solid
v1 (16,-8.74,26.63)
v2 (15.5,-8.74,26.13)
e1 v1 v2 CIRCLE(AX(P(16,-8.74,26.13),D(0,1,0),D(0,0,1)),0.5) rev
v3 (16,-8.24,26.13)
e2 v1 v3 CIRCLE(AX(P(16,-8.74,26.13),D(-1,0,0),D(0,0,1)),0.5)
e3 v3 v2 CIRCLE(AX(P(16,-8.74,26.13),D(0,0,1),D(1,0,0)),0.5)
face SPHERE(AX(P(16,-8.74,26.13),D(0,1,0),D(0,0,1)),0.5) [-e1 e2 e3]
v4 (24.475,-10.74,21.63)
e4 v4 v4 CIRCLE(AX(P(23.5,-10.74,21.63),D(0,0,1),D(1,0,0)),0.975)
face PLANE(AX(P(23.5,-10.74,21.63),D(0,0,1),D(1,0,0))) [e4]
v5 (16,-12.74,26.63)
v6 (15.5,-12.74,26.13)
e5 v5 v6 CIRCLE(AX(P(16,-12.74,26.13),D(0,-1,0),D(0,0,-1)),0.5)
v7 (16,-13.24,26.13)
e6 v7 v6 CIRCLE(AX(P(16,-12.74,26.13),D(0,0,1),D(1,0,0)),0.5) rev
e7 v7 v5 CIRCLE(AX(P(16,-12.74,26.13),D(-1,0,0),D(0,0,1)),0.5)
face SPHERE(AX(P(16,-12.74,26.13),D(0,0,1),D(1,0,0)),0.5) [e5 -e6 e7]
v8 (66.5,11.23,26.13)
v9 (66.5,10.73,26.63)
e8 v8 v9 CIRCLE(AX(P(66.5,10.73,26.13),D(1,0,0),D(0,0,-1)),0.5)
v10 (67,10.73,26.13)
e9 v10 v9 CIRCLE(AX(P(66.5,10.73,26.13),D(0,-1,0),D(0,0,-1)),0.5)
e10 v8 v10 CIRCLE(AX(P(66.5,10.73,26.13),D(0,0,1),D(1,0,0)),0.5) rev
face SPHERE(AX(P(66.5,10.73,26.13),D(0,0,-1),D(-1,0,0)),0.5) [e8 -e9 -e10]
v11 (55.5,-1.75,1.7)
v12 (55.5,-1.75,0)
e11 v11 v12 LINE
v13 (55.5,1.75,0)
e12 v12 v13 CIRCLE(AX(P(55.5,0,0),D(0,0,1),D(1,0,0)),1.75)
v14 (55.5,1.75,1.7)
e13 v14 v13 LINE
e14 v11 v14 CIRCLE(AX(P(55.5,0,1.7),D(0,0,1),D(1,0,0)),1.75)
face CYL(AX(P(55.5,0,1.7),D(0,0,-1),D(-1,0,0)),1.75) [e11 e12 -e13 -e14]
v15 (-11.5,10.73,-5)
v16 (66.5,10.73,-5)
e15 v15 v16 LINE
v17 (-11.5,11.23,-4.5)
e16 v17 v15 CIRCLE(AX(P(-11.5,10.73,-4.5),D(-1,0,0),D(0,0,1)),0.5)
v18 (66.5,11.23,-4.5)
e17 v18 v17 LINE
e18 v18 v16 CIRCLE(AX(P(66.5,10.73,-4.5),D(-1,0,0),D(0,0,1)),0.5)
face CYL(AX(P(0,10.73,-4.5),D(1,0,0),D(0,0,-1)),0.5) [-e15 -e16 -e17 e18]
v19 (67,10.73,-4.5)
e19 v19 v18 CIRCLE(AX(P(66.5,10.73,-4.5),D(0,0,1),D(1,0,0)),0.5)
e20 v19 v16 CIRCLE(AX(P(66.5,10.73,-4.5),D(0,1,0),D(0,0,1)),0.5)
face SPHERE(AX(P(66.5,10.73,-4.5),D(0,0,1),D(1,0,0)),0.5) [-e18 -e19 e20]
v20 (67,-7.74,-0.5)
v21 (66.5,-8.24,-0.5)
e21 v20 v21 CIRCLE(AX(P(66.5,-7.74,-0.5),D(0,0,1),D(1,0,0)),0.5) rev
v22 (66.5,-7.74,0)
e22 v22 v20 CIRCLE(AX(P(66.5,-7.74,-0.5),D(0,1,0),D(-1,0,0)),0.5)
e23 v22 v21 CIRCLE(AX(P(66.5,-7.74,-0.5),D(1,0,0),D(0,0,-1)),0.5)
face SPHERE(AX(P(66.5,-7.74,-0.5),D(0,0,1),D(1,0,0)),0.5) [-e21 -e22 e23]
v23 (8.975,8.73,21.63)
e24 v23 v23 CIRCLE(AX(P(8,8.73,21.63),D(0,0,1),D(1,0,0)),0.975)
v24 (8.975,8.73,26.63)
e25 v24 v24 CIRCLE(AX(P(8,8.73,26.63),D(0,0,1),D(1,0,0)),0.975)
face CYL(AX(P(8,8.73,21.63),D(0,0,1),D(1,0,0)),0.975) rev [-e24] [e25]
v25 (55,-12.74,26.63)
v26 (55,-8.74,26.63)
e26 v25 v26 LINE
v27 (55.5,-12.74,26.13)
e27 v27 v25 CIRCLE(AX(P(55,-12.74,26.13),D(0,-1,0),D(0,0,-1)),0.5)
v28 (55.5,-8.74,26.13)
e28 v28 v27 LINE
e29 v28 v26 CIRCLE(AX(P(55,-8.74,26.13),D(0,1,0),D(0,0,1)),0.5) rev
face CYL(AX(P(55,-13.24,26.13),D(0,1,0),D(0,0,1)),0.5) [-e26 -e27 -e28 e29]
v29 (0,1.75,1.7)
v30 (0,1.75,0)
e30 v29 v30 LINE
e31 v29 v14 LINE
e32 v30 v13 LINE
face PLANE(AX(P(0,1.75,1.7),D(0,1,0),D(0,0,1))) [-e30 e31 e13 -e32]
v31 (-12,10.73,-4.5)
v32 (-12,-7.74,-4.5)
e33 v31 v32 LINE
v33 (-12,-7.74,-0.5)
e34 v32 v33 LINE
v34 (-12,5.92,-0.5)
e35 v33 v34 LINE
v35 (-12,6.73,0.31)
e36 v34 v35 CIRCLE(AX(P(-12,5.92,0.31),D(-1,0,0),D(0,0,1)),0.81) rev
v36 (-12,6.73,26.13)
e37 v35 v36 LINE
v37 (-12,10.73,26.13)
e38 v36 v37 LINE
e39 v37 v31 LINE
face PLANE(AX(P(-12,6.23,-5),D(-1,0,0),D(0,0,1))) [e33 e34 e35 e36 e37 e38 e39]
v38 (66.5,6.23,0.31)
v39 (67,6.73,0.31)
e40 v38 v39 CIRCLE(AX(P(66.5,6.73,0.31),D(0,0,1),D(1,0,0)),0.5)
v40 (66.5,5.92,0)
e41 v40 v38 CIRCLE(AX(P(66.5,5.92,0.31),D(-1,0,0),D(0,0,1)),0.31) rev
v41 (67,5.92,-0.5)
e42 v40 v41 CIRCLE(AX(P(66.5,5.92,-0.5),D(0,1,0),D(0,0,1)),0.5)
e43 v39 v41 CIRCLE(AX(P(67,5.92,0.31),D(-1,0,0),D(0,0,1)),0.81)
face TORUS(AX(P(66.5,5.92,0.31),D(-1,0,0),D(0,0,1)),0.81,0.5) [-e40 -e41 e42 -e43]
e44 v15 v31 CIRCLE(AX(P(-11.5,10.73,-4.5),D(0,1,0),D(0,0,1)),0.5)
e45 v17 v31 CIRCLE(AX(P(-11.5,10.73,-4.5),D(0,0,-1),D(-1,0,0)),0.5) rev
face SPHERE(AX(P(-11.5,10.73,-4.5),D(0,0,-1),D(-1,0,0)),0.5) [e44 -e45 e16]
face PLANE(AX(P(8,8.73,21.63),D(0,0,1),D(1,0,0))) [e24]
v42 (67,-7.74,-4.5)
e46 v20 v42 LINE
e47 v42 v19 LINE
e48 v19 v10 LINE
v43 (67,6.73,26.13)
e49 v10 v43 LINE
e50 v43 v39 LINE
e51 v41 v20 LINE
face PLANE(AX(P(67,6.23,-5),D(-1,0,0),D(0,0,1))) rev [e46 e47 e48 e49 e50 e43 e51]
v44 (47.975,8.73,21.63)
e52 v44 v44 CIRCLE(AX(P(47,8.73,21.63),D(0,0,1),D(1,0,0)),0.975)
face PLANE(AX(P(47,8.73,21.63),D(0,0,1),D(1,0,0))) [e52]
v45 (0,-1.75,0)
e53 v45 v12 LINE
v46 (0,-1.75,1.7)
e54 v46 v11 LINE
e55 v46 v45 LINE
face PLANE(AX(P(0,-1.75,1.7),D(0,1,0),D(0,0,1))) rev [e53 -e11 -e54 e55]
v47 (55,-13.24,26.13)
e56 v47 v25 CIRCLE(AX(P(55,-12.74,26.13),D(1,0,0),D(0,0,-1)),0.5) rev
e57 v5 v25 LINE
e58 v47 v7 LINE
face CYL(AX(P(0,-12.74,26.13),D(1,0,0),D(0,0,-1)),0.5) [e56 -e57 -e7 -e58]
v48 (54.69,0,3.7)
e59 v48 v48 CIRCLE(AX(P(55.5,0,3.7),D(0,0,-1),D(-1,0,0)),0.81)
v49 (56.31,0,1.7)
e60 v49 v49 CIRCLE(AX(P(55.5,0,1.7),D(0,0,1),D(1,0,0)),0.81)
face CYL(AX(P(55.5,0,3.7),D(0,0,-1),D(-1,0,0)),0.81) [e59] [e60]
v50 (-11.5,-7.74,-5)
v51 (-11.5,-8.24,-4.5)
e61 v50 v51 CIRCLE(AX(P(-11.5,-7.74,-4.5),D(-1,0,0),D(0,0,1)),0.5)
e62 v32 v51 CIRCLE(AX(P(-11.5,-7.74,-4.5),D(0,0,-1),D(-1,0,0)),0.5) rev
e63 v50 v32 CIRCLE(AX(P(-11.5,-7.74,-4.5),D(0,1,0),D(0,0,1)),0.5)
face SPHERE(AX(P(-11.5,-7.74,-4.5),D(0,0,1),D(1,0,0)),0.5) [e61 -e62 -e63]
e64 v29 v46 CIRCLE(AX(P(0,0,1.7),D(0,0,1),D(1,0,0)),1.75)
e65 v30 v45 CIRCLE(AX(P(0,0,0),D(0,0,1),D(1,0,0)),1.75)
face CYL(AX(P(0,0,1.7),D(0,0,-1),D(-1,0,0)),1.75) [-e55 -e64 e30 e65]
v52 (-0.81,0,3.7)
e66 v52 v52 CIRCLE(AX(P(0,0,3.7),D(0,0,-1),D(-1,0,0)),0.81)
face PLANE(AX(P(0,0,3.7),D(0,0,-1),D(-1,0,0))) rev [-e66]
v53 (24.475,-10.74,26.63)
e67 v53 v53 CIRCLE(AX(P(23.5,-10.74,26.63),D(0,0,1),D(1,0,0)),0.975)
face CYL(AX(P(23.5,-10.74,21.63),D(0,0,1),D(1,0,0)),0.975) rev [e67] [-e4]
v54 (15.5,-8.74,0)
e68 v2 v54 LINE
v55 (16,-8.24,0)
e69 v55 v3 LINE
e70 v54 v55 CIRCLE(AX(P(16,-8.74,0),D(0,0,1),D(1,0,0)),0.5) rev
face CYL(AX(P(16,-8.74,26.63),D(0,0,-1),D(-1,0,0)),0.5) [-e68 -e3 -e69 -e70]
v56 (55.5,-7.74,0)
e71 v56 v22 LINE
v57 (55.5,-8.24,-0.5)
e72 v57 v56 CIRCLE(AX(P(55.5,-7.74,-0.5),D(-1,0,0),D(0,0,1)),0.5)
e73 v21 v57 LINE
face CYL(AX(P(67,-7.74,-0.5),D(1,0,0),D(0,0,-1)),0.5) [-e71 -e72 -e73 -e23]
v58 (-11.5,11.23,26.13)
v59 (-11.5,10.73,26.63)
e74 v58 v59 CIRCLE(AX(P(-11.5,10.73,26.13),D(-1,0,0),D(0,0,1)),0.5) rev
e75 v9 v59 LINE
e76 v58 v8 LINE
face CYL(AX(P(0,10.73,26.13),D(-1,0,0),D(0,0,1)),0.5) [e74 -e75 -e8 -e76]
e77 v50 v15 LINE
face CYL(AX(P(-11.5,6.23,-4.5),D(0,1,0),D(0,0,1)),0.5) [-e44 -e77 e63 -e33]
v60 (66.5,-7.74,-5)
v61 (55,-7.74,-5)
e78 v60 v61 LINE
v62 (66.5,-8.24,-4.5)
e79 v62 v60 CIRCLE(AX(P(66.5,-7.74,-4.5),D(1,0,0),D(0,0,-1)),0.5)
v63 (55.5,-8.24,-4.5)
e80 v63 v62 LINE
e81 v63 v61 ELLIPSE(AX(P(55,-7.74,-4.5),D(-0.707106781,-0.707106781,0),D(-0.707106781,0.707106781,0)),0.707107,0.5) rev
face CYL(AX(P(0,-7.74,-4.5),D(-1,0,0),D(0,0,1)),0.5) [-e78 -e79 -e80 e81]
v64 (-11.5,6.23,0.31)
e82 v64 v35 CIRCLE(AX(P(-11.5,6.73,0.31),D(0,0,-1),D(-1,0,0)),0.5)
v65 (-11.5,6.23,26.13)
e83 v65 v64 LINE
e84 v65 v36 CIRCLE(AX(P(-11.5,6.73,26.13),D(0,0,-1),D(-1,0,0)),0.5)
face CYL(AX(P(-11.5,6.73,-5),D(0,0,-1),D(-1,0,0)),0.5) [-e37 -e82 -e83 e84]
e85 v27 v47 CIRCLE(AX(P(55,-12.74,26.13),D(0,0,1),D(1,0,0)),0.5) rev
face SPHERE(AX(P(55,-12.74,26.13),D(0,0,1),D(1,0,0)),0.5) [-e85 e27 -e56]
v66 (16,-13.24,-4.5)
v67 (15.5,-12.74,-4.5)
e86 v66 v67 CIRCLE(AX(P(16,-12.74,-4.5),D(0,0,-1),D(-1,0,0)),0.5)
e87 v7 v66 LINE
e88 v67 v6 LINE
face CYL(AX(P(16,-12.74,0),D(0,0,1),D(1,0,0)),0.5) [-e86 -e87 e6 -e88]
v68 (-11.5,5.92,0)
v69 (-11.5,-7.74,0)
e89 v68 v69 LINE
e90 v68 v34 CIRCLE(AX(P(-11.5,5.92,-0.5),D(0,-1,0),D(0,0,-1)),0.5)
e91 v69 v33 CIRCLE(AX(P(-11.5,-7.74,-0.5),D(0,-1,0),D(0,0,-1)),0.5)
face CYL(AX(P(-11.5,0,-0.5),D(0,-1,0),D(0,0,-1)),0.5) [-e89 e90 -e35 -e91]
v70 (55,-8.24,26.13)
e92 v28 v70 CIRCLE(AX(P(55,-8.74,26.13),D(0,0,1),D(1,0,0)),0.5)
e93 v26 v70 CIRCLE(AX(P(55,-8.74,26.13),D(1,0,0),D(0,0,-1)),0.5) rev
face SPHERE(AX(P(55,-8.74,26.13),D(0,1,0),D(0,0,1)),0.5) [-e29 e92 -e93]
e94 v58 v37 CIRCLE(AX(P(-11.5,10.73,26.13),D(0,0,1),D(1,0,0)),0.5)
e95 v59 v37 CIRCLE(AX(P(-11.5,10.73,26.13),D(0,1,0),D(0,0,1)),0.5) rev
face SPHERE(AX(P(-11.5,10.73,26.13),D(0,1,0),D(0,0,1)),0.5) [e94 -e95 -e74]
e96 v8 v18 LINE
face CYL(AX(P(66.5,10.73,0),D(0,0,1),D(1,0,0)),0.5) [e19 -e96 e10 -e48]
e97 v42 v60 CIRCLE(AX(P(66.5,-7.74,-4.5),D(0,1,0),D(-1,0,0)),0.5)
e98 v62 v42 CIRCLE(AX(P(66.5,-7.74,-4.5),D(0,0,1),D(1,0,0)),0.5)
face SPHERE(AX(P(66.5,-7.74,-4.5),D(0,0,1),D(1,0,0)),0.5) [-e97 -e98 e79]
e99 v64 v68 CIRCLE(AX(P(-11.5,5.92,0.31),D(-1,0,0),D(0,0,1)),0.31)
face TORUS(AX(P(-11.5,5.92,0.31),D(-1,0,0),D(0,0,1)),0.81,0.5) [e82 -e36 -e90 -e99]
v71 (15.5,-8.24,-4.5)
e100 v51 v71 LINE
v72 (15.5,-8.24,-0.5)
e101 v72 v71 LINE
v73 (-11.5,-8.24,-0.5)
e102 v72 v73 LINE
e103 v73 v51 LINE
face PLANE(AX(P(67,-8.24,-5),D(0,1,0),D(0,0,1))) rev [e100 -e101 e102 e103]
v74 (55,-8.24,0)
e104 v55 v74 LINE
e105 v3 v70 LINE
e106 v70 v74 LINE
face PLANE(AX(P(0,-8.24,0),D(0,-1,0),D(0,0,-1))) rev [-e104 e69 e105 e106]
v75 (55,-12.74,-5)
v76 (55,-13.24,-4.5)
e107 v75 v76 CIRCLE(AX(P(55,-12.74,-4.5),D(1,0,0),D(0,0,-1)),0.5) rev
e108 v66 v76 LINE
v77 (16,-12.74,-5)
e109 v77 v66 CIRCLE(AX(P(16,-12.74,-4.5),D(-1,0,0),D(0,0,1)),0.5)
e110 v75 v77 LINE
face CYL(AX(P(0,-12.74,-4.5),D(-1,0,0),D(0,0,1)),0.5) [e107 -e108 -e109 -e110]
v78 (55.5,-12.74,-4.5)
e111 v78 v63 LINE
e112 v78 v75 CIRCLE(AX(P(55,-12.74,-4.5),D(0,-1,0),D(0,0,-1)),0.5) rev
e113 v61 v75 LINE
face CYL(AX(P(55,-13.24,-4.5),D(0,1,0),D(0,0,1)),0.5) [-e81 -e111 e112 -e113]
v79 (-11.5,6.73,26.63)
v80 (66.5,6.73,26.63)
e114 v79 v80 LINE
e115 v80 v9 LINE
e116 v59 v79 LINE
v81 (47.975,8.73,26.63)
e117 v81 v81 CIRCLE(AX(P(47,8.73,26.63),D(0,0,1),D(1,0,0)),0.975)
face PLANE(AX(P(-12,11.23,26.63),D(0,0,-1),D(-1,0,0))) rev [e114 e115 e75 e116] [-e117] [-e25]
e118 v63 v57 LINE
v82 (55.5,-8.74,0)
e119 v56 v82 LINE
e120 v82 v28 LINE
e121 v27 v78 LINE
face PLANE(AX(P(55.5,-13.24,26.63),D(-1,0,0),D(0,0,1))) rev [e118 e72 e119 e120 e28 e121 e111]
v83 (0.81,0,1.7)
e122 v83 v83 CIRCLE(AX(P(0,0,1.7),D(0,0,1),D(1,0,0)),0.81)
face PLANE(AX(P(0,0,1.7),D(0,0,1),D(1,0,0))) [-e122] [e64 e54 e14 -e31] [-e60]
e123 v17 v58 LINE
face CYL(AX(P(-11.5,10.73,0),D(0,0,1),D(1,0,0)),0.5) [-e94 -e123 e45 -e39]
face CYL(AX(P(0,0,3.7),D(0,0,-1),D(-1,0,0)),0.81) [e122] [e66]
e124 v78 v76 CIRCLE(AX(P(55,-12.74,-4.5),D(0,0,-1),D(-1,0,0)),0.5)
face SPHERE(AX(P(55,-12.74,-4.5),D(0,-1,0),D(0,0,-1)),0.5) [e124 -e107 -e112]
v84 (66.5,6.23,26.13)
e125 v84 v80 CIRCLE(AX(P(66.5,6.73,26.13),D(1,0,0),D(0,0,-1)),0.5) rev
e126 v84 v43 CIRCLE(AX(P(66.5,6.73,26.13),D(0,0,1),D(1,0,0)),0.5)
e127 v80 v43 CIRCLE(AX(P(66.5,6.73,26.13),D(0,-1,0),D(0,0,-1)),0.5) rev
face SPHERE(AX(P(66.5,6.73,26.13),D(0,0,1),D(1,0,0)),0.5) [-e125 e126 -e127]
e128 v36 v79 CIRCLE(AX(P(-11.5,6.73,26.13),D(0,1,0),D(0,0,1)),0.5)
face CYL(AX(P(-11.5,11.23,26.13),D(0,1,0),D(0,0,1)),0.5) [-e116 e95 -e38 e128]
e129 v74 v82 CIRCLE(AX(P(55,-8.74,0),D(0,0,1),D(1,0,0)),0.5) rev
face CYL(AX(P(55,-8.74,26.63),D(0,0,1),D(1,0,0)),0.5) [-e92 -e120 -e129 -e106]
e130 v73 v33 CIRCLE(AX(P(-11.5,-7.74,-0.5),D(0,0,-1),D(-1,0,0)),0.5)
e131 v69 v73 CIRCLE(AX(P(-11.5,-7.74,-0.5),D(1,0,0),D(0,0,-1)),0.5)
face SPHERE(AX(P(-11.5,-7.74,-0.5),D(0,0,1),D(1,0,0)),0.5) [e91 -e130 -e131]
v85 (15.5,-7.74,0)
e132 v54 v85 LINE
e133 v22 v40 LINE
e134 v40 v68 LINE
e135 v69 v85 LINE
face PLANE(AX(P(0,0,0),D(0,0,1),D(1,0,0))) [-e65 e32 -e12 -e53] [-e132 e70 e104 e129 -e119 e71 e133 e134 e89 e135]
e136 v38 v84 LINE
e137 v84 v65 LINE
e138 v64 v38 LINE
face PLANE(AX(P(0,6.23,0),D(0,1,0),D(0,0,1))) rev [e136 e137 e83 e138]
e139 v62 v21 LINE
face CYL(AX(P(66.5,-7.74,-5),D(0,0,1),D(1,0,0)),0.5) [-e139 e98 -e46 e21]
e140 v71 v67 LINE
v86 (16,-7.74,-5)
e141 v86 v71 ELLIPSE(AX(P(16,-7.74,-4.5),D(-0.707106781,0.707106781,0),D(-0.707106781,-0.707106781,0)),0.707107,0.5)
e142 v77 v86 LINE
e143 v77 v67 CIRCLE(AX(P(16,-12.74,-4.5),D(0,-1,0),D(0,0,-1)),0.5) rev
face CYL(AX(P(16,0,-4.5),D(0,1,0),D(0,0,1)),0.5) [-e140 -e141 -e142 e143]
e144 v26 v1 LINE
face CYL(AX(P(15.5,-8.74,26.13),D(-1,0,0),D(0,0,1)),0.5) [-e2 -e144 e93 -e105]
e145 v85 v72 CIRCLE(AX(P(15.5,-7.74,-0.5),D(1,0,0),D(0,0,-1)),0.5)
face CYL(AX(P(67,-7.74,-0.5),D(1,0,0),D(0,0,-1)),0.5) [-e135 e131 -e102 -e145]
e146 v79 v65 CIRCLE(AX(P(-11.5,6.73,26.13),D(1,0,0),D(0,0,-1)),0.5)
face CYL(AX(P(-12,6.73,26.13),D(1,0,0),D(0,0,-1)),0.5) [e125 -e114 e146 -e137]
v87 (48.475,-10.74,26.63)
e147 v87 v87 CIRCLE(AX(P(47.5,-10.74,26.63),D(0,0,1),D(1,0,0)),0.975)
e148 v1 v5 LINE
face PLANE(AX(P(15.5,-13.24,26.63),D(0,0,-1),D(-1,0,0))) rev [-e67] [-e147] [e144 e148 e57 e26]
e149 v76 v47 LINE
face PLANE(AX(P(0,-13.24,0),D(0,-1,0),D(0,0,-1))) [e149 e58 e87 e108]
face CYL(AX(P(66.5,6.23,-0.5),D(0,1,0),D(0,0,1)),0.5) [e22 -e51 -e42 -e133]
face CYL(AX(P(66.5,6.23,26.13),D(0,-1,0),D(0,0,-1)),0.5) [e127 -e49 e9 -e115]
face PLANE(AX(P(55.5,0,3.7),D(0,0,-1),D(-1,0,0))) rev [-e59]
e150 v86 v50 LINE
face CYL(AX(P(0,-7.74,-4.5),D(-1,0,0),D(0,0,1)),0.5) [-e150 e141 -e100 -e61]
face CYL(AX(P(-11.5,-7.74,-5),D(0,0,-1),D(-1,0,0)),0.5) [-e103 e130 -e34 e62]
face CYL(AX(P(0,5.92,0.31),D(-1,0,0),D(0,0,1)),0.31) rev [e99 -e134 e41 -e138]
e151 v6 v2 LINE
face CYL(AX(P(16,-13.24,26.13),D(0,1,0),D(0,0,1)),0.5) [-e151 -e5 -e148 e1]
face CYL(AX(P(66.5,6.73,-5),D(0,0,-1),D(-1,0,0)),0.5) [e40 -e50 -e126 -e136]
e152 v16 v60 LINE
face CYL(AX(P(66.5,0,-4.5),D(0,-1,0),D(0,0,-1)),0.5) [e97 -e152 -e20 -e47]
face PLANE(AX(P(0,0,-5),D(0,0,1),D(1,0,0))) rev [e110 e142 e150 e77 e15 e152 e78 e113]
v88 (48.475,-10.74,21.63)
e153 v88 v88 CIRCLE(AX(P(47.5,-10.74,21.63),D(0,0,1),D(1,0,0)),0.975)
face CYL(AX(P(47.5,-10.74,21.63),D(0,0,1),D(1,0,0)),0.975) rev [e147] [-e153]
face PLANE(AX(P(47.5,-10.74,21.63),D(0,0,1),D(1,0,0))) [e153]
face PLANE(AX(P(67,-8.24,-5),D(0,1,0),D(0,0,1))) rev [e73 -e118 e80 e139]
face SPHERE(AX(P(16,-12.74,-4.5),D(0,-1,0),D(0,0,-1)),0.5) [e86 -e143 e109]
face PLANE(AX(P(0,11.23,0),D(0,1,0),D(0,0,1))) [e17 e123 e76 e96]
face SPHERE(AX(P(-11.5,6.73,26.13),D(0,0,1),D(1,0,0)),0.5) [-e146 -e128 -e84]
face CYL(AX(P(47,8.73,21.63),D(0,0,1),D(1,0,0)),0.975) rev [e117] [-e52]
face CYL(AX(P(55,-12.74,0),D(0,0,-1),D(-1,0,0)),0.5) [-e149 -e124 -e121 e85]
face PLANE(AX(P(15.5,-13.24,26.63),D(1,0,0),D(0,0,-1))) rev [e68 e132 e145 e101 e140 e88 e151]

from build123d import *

# Parameters (mm, degrees)
EXTRUDE_3_DEPTH     = 1.7
SKETCH_4_R          = 0.81
EXTRUDE_4_DEPTH     = 3.7
SKETCH_5_W          = 79
SKETCH_5_H          = 14.47
EXTRUDE_5_DEPTH     = 5
SKETCH_6_W          = 79
SKETCH_6_H          = 31.63
EXTRUDE_6_DEPTH     = 5
FILLET_1_R          = 0.31
FILLET_2_R          = 0.5
FILLET_3_R          = 0.5
FILLET_5_R          = 0.5
SKETCH_8_W          = 40
SKETCH_8_H          = 31.63
EXTRUDE_7_DEPTH     = 5
FILLET_6_R          = 0.5
SKETCH_9_R          = 0.975
CUT_EXTRUDE_1_DEPTH = 5
FILLET_7_R          = 0.5


with BuildPart() as part:
    # 草图1 → 凸台-拉伸3 (new body)
    with BuildSketch(Plane.XY):
        with BuildLine():
            Line((0, 1.75), (55.5, 1.75))
            ThreePointArc((55.5, 1.75), (57.25, 0), (55.5, -1.75))
            Line((55.5, -1.75), (0, -1.75))
            ThreePointArc((0, -1.75), (-1.75, 0), (0, 1.75))
        make_face()
    extrude(amount=EXTRUDE_3_DEPTH)

    # 草图4 → 凸台-拉伸4 (add)
    with BuildSketch(Plane(origin=(0, 0, 0), x_dir=(-1, 0, 0), z_dir=(0, 0, -1))):
        Circle(SKETCH_4_R)
        with Locations((-55.5, 0)):
            Circle(SKETCH_4_R)
    extrude(amount=-EXTRUDE_4_DEPTH)

    # 草图5 → 凸台-拉伸5 (add)
    with BuildSketch(Plane(origin=(0, 0, 0), x_dir=(-1, 0, 0), z_dir=(0, 0, -1))):
        with Locations((-27.5, -1.005)):
            Rectangle(SKETCH_5_W, SKETCH_5_H)
    extrude(amount=EXTRUDE_5_DEPTH)

    # 草图6 → 凸台-拉伸6 (add)
    with BuildSketch(Plane(origin=(0, 6.23, 0), x_dir=(1, 0, 0), z_dir=(0, 1, 0))):
        with Locations((27.5, -10.815)):
            Rectangle(SKETCH_6_W, SKETCH_6_H)
    extrude(amount=EXTRUDE_6_DEPTH)

    # 圆角1
    fillet_1_edges = [part.edges().sort_by_distance(p)[0] for p in [
        (27.5, 6.23, 0),
    ]]
    fillet(fillet_1_edges, radius=FILLET_1_R)

    # 圆角2
    fillet_2_edges = [part.edges().sort_by_distance(p)[0] for p in [
        (67, -8.24, -2.5),
    ]]
    fillet(fillet_2_edges, radius=FILLET_2_R)

    # 圆角3
    fillet_3_edges = [part.edges().sort_by_distance(p)[0] for p in [
        (-12, -8.24, -2.5),
    ]]
    fillet(fillet_3_edges, radius=FILLET_3_R)

    # 圆角5
    fillet_5_edges = [part.edges().sort_by_distance(p)[0] for p in [
        (67, 11.23, 10.815),
    ]]
    fillet(fillet_5_edges, radius=FILLET_5_R)

    # 草图8 → 凸台-拉伸7 (add)
    with BuildSketch(Plane(origin=(0, -8.24, 0), x_dir=(-1, 0, 0), z_dir=(0, -1, 0))):
        with Locations((-35.5, -10.815)):
            Rectangle(SKETCH_8_W, SKETCH_8_H)
    extrude(amount=EXTRUDE_7_DEPTH)

    # 圆角6
    fillet_6_edges = [part.edges().sort_by_distance(p)[0] for p in [
        (67, 8.48, 26.63),
        (66.853553391, 11.083553391, 26.63),
        (2, -8.24, -5),
        (-11.853553391, -8.093553391, -5),
        (27.25, 11.23, -5),
        (66.853553391, 11.083553391, -5),
        (61, -8.24, -5),
        (66.853553391, -8.093553391, -5),
        (27.5, 6.23, 26.63),
        (-12, 8.73, 26.63),
        (27.25, 11.23, 26.63),
        (-12, 11.23, 10.815),
        (15.5, -8.24, 13.315),
        (15.5, -10.74, 26.63),
        (35.5, -8.24, 26.63),
        (55.5, -8.24, 13.315),
        (55.5, -10.74, 26.63),
        (55.5, -13.24, 10.815),
        (35.5, -13.24, 26.63),
        (15.5, -13.24, 10.815),
        (15.5, -10.74, -5),
        (-12, 1.745, -5),
        (55.5, -10.74, -5),
        (35.5, -13.24, -5),
        (67, 1.495, -5),
    ]]
    fillet(fillet_6_edges, radius=FILLET_6_R)

    # 草图9 → 切除-拉伸1 (cut)
    with BuildSketch(Plane.XY.offset(26.63)):
        with Locations((23.5, -10.74)):
            Circle(SKETCH_9_R)
        with Locations((47.5, -10.74)):
            Circle(SKETCH_9_R)
        with Locations((8, 8.73)):
            Circle(SKETCH_9_R)
        with Locations((47, 8.73)):
            Circle(SKETCH_9_R)
    extrude(amount=-CUT_EXTRUDE_1_DEPTH, mode=Mode.SUBTRACT)

    # 圆角7
    # the kernel refuses this fillet: 0.5 mm, written as the material it takes off along each edge
    with BuildSketch(Plane(origin=(-11.5, 6.73, 26.13), x_dir=(-1, 0, 0), z_dir=(0, -1, 0))) as fillet_7_piece_1_section:
        Polygon((0, 0), (FILLET_7_R * 1.02, 0), (FILLET_7_R * 1.02, -FILLET_7_R * 1.02), (0, -FILLET_7_R * 1.02), align=None)
    fillet_7_piece_1 = extrude(amount=FILLET_7_R * 1.02, mode=Mode.PRIVATE)
    fillet_7_piece_1 = fillet_7_piece_1 - Plane(origin=(-11.5, 6.73, 26.13), x_dir=(0.7071067811865475, 0, -0.7071067811865475), z_dir=(0, -1, 0)) * Sphere(FILLET_7_R, mode=Mode.PRIVATE)
    add(fillet_7_piece_1, mode=Mode.SUBTRACT)
    with BuildSketch(Plane(origin=(66.5, 6.73, 26.13), x_dir=(0, -1, 0), z_dir=(1, 0, 0))) as fillet_7_piece_2_section:
        Polygon((0, 0), (FILLET_7_R * 1.02, 0), (FILLET_7_R * 1.02, -FILLET_7_R * 1.02), (0, -FILLET_7_R * 1.02), align=None)
    fillet_7_piece_2 = extrude(amount=FILLET_7_R * 1.02, mode=Mode.PRIVATE)
    fillet_7_piece_2 = fillet_7_piece_2 - Plane(origin=(66.5, 6.73, 26.13), x_dir=(0, 0.7071067811865475, -0.7071067811865475), z_dir=(1, 0, 0)) * Sphere(FILLET_7_R, mode=Mode.PRIVATE)
    add(fillet_7_piece_2, mode=Mode.SUBTRACT)
    with BuildSketch(Plane(origin=(-12, 5.92, 0), x_dir=(1, 0, 0), z_dir=(0, -1, 0))) as fillet_7_piece_3:
        with BuildLine():
            CenterArc((FILLET_7_R, -FILLET_7_R), FILLET_7_R, 90, 90)
            Line((0, -FILLET_7_R), (0, 0))
            Line((0, 0), (FILLET_7_R, 0))
        make_face()
    extrude(amount=13.66, mode=Mode.SUBTRACT)
    with BuildSketch(Plane(origin=(67, -7.74, 0), x_dir=(0, 0, -1), z_dir=(0, 1, 0))) as fillet_7_piece_4:
        with BuildLine():
            CenterArc((FILLET_7_R, FILLET_7_R), FILLET_7_R, 180, 90)
            Line((0, FILLET_7_R), (0, 0))
            Line((0, 0), (FILLET_7_R, 0))
        make_face()
    extrude(amount=13.66, mode=Mode.SUBTRACT)
    with BuildSketch(Plane(origin=(-12, 6.23, 26.13), x_dir=(1, 0, 0), z_dir=(0, 0, -1))) as fillet_7_piece_5:
        with BuildLine():
            CenterArc((FILLET_7_R, -FILLET_7_R), FILLET_7_R, 90, 90)
            Line((0, -FILLET_7_R), (0, 0))
            Line((0, 0), (FILLET_7_R, 0))
        make_face()
    extrude(amount=25.82, mode=Mode.SUBTRACT)
    with BuildSketch(Plane(origin=(-12, 5.92, 0.31), x_dir=(0, 0, -1), z_dir=(0, -1, 0))) as fillet_7_piece_6:
        with BuildLine():
            CenterArc((0.31 + FILLET_7_R, FILLET_7_R), FILLET_7_R, 180, 90)
            Line((0.31 + FILLET_7_R, 0), (0.31, 0))
            Line((0.31, 0), (0.31, FILLET_7_R))
        make_face()
    revolve(axis=Axis((-12, 5.92, 0.31), (1, 0, 0)), revolution_arc=90, mode=Mode.SUBTRACT)
    with BuildSketch(Plane(origin=(67, 5.92, 0.31), x_dir=(0, 0, -1), z_dir=(0, -1, 0))) as fillet_7_piece_7:
        with BuildLine():
            CenterArc((0.31 + FILLET_7_R, -FILLET_7_R), FILLET_7_R, 90, 90)
            Line((0.31, -FILLET_7_R), (0.31, 0))
            Line((0.31, 0), (0.31 + FILLET_7_R, 0))
        make_face()
    revolve(axis=Axis((67, 5.92, 0.31), (1, 0, 0)), revolution_arc=90, mode=Mode.SUBTRACT)
    with BuildSketch(Plane(origin=(55.5, -8.24, 0), x_dir=(0, 1, 0), z_dir=(1, 0, 0))) as fillet_7_piece_8:
        with BuildLine():
            CenterArc((FILLET_7_R, -FILLET_7_R), FILLET_7_R, 90, 90)
            Line((0, -FILLET_7_R), (0, 0))
            Line((0, 0), (FILLET_7_R, 0))
        make_face()
    extrude(amount=11, mode=Mode.SUBTRACT)
    with BuildSketch(Plane(origin=(66.5, -7.74, 0), x_dir=(1, 0, 0), z_dir=(0, 1, 0))) as fillet_7_piece_9:
        with BuildLine():
            CenterArc((0.5 - FILLET_7_R, FILLET_7_R), FILLET_7_R, 270, 90)
            Line((0.5 - FILLET_7_R, 0), (0.5, 0))
            Line((0.5, 0), (0.5, FILLET_7_R))
        make_face()
    revolve(axis=Axis((66.5, -7.74, 0), (0, 0, -1)), revolution_arc=90, mode=Mode.SUBTRACT)
    with BuildSketch(Plane(origin=(-11.5, -7.74, 0), x_dir=(0, -1, 0), z_dir=(1, 0, 0))) as fillet_7_piece_10:
        with BuildLine():
            CenterArc((0.5 - FILLET_7_R, FILLET_7_R), FILLET_7_R, 270, 90)
            Line((0.5, FILLET_7_R), (0.5, 0))
            Line((0.5, 0), (0.5 - FILLET_7_R, 0))
        make_face()
    revolve(axis=Axis((-11.5, -7.74, 0), (0, 0, -1)), revolution_arc=90, mode=Mode.SUBTRACT)
    with BuildSketch(Plane(origin=(-11.5, -8.24, 0), x_dir=(0, 1, 0), z_dir=(1, 0, 0))) as fillet_7_piece_11:
        with BuildLine():
            CenterArc((FILLET_7_R, -FILLET_7_R), FILLET_7_R, 90, 90)
            Line((0, -FILLET_7_R), (0, 0))
            Line((0, 0), (FILLET_7_R, 0))
        make_face()
    extrude(amount=27, mode=Mode.SUBTRACT)
    with BuildSketch(Plane(origin=(67, 6.23, 0.31), x_dir=(0, 1, 0), z_dir=(0, 0, 1))) as fillet_7_piece_12:
        with BuildLine():
            CenterArc((FILLET_7_R, FILLET_7_R), FILLET_7_R, 180, 90)
            Line((0, FILLET_7_R), (0, 0))
            Line((0, 0), (FILLET_7_R, 0))
        make_face()
    extrude(amount=25.82, mode=Mode.SUBTRACT)


solid = part.part
